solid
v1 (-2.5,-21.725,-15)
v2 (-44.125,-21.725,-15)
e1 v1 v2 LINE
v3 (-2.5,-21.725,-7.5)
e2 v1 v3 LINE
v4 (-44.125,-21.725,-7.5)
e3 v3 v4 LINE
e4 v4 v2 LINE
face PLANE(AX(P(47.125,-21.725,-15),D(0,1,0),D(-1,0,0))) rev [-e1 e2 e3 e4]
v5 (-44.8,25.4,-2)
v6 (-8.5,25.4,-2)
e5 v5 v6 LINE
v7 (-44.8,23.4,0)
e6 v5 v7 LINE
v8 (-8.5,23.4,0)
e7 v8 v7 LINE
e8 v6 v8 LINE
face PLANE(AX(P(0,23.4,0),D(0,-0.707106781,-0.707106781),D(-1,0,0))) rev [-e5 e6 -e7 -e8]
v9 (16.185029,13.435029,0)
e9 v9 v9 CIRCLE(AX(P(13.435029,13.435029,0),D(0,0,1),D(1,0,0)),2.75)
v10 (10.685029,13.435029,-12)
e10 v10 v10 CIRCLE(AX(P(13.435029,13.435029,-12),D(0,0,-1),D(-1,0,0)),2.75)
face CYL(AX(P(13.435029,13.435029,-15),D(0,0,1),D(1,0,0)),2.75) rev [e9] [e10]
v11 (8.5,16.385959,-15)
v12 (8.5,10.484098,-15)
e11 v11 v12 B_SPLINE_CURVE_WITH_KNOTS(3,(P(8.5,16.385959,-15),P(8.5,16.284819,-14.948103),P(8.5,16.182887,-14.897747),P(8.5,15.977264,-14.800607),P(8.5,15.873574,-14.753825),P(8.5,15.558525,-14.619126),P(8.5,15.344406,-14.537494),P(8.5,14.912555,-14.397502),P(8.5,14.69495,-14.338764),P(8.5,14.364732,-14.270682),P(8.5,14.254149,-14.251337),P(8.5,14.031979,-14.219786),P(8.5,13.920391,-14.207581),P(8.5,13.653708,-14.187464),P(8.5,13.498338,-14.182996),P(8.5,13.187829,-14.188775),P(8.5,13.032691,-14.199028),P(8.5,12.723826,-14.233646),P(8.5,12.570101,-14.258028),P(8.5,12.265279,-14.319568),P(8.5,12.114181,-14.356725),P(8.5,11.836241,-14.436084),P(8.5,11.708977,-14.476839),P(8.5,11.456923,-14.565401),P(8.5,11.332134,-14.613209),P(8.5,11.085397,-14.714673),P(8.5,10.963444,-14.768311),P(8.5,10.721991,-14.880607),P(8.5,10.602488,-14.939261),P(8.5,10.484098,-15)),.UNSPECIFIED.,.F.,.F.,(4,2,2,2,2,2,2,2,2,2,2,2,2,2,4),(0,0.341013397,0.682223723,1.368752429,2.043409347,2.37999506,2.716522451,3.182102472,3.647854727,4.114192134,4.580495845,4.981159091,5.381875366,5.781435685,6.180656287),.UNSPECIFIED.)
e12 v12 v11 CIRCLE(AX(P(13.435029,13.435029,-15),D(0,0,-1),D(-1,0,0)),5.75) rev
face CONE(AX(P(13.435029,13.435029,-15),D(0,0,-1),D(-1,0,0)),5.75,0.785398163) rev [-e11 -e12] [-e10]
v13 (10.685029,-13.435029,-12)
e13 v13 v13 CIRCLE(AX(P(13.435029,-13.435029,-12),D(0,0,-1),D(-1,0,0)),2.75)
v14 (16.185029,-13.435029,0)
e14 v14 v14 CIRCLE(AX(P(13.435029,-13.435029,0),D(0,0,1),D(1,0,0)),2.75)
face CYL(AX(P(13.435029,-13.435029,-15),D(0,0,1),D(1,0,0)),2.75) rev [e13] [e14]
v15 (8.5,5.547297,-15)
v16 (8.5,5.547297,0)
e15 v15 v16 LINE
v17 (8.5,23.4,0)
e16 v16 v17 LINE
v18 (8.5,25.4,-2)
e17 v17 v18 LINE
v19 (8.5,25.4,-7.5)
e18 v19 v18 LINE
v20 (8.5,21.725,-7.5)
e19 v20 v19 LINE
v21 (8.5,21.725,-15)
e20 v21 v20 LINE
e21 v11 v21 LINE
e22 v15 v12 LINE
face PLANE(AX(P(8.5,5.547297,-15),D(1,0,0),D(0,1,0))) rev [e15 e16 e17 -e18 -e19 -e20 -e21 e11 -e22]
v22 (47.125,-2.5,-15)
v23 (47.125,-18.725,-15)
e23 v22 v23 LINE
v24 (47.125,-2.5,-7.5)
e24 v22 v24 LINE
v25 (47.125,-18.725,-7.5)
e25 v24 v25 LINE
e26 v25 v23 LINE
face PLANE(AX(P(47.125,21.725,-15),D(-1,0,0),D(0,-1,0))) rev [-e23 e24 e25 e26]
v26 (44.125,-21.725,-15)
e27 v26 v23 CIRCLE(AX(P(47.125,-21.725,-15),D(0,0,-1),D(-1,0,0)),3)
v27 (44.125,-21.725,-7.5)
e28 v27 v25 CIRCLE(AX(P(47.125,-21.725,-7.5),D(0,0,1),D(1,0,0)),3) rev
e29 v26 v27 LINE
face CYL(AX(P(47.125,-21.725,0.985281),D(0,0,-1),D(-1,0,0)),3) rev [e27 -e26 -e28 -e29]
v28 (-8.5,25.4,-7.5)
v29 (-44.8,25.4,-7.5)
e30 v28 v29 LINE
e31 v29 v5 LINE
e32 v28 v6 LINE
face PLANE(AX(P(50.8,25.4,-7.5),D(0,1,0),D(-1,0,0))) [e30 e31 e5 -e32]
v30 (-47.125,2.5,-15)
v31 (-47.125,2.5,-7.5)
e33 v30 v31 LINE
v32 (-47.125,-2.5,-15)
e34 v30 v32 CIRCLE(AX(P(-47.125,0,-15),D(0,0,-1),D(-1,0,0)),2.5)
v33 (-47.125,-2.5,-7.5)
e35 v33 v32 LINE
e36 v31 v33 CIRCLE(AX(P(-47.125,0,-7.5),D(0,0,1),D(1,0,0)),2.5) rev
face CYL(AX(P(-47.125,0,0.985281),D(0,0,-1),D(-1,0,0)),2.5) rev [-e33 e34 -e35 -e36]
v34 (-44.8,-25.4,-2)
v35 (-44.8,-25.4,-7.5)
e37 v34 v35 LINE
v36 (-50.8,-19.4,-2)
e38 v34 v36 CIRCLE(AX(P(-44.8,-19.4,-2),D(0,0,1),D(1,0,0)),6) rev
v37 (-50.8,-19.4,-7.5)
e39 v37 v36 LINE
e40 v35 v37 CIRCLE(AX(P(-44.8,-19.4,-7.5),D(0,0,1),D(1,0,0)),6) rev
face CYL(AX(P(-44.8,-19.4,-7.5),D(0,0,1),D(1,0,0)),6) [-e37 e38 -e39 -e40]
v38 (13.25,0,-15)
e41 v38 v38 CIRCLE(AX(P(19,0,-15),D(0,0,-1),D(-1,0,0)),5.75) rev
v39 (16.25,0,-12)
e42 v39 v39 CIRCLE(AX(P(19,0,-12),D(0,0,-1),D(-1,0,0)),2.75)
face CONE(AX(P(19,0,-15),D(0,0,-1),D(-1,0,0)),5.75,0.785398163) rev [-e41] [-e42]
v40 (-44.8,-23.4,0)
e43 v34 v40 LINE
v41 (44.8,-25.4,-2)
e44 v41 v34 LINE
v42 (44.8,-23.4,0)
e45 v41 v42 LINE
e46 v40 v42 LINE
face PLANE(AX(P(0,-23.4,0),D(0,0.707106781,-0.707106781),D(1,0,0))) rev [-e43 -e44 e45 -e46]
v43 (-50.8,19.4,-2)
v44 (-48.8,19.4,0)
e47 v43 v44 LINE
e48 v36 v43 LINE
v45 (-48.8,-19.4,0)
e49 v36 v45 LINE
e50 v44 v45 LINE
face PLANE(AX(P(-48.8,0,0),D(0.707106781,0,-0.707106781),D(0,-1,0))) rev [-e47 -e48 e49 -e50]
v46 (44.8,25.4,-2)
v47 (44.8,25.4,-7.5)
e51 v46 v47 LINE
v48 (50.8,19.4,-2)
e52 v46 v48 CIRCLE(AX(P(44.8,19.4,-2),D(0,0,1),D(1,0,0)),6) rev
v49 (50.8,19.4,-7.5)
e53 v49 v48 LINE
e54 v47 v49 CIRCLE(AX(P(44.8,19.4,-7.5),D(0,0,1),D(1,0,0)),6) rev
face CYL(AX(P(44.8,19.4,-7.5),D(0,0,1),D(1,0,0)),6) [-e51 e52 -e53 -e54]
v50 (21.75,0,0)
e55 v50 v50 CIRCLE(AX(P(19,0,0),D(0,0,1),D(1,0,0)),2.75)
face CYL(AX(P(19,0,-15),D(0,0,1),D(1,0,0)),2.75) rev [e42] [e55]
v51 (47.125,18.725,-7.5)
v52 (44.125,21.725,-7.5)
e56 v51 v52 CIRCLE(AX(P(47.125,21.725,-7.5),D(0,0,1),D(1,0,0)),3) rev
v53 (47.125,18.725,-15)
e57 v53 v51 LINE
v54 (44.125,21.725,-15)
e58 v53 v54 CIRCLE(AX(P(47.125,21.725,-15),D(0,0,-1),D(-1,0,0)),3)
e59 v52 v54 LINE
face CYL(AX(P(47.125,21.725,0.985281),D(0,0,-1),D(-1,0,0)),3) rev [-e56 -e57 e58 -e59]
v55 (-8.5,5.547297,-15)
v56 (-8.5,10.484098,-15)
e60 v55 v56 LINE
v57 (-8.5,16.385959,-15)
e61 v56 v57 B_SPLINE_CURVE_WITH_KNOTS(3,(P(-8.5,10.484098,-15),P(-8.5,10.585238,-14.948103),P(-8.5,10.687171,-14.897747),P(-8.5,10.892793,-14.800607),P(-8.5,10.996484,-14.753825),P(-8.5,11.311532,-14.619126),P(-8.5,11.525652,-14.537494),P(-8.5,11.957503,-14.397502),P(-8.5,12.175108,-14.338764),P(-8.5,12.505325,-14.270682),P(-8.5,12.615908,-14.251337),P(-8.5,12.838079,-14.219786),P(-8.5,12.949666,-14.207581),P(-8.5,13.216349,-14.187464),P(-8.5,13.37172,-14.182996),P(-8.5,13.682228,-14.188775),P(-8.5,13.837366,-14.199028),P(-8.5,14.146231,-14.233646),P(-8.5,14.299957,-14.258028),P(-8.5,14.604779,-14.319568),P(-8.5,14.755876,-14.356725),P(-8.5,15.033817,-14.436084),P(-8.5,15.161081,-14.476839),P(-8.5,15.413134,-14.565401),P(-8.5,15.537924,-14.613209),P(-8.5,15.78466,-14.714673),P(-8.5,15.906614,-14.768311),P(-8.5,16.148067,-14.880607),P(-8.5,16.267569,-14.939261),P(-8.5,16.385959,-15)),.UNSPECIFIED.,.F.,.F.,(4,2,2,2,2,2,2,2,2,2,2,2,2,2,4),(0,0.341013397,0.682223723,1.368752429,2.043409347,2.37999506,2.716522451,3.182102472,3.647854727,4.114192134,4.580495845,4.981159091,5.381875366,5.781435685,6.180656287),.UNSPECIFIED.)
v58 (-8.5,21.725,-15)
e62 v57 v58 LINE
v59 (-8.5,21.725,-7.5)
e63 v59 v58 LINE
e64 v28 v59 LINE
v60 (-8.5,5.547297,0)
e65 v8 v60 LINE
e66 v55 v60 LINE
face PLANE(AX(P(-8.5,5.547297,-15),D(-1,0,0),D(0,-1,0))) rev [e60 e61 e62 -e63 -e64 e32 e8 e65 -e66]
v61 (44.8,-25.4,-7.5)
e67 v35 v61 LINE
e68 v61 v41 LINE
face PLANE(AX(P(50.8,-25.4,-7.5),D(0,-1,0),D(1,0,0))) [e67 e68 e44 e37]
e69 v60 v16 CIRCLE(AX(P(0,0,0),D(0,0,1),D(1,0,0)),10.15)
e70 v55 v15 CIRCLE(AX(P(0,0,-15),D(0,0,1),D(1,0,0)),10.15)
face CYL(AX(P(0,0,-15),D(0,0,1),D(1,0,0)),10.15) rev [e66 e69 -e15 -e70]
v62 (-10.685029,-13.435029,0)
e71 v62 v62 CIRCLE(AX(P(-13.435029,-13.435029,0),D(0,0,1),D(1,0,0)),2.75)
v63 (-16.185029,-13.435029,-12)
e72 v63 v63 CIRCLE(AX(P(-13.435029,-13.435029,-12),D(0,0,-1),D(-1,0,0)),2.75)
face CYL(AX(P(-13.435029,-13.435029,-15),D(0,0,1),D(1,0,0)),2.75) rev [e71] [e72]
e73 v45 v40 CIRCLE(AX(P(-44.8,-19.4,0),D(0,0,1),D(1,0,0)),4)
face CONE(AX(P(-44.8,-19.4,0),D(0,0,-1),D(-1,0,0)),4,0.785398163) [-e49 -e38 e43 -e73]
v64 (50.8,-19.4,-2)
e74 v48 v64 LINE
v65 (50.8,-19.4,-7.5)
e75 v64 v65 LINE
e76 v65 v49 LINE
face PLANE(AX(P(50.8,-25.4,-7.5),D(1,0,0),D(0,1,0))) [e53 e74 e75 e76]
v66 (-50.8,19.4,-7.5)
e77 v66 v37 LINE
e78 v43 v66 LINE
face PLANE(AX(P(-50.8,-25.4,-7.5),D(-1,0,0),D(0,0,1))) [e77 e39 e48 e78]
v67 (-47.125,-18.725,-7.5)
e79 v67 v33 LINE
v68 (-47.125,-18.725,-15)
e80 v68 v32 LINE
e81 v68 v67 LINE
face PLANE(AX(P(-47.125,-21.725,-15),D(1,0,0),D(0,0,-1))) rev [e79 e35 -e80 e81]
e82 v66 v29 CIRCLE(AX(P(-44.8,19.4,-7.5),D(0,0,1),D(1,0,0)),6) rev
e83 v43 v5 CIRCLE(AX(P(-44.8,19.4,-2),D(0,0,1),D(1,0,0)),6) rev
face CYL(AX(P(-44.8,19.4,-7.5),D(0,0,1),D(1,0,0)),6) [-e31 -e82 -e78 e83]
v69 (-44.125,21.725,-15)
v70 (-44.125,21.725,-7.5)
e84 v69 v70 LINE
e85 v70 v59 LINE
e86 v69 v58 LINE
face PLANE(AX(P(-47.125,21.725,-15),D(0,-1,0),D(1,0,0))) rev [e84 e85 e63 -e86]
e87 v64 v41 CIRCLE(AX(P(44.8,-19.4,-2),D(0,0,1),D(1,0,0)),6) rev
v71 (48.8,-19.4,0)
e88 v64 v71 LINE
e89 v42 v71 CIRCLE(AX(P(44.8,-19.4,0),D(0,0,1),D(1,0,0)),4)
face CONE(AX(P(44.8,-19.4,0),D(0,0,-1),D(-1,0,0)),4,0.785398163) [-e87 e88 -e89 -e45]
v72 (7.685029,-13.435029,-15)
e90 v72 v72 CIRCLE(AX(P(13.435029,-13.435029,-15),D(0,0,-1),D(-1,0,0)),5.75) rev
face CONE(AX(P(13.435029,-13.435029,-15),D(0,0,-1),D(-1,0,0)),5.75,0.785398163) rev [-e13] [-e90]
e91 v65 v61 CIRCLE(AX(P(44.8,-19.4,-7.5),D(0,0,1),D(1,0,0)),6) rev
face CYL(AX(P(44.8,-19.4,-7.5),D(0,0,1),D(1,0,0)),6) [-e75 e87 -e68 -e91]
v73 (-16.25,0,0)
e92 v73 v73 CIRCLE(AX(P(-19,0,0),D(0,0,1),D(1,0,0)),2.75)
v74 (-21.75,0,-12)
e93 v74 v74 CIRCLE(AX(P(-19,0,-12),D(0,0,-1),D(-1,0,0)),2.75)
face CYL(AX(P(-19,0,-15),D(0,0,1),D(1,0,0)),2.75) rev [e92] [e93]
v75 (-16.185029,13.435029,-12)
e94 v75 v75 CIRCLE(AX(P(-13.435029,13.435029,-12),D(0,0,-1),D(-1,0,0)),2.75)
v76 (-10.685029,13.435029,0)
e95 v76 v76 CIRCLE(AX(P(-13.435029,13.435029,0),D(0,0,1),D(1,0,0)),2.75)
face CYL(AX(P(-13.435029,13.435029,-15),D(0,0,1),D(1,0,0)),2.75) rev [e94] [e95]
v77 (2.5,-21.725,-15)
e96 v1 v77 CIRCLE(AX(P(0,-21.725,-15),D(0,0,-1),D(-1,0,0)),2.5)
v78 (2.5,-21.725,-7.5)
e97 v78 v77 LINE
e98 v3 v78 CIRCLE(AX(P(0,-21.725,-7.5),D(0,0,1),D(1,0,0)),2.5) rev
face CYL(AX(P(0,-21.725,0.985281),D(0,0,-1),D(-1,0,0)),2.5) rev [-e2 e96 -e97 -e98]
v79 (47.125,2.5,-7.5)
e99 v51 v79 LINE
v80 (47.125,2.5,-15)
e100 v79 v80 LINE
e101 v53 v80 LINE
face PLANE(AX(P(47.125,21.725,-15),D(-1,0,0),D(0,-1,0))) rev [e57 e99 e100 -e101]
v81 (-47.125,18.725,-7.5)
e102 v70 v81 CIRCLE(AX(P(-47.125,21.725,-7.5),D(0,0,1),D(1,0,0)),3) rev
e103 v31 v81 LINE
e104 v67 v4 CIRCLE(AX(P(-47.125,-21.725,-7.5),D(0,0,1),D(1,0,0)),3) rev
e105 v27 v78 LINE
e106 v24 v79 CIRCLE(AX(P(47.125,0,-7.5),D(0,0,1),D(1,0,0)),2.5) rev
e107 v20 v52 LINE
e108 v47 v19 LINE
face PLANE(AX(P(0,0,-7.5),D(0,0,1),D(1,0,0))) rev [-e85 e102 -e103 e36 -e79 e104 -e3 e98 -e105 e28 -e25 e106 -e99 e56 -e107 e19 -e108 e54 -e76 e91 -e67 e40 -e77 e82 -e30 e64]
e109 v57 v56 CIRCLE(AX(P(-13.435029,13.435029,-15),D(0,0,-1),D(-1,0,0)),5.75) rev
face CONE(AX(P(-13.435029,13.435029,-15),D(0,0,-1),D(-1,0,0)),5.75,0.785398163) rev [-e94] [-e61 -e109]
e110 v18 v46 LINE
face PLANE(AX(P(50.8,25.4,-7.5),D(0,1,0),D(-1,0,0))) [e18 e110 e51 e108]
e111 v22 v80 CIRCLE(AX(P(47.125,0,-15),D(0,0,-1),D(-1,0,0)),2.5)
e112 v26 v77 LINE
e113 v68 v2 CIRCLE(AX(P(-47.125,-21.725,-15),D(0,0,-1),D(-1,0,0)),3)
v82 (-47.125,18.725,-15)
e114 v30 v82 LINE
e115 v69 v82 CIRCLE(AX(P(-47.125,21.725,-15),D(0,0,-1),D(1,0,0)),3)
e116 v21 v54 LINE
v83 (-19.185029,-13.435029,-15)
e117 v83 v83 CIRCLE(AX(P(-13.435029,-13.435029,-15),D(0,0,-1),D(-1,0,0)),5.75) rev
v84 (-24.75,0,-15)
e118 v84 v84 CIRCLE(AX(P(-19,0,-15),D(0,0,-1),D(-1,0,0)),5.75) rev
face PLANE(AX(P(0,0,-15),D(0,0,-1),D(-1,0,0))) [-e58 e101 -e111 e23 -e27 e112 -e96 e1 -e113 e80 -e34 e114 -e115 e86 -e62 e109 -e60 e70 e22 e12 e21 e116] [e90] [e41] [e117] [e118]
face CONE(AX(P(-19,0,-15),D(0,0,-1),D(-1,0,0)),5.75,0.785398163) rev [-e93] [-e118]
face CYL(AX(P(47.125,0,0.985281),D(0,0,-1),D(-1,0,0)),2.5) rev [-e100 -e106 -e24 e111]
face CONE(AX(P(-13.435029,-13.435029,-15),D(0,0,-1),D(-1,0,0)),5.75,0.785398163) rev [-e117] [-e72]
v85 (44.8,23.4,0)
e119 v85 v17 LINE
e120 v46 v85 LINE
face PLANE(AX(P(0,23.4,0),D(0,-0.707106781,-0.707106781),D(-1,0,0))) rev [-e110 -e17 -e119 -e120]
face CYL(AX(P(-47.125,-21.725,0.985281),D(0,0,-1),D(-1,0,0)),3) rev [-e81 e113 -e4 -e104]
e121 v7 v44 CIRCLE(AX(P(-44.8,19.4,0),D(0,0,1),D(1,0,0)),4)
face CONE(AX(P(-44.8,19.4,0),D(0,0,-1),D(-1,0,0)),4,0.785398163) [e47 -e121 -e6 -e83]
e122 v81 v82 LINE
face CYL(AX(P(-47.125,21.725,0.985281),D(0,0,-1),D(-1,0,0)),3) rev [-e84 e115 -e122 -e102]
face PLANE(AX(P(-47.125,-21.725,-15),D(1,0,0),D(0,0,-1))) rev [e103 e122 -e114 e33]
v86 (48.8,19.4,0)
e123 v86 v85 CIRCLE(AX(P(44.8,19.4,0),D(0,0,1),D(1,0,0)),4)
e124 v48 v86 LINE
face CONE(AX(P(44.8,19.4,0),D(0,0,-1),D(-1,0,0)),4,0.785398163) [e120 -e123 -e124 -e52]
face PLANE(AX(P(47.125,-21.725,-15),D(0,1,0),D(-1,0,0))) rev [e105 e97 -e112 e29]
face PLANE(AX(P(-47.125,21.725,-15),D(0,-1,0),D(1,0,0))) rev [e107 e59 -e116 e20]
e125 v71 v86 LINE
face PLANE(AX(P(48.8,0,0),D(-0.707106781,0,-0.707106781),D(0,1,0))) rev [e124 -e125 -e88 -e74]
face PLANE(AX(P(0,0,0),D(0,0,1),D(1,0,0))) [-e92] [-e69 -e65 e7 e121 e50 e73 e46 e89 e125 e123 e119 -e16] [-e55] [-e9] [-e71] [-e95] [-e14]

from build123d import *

# Parameters (mm, degrees)
SKETCH1_W           = 101.6
SKETCH1_H           = 50.8
BOSS_EXTRUDE1_DEPTH = 7.5
SKETCH2_W           = 94.25
SKETCH2_H           = 43.45
BOSS_EXTRUDE2_DEPTH = 7.5
SKETCH3_R           = 2.75
CUT_EXTRUDE1_DEPTH  = 59.74351028
FILLET1_R           = 6
SKETCH4_R           = 3
SKETCH4_R_2         = 2.5
CUT_EXTRUDE2_DEPTH  = 7.5
CHAMFER1_SIZE       = 2
CHAMFER2_SIZE       = 3


with BuildPart() as part:
    # Sketch1 → Boss-Extrude1 (new body)
    with BuildSketch(Plane.XY):
        Rectangle(SKETCH1_W, SKETCH1_H)
    extrude(amount=-BOSS_EXTRUDE1_DEPTH)

    # Sketch2 → Boss-Extrude2 (add)
    with BuildSketch(Plane(origin=(0, 0, -7.5), x_dir=(-1, 0, 0), z_dir=(0, 0, -1))):
        Rectangle(SKETCH2_W, SKETCH2_H)
    extrude(amount=BOSS_EXTRUDE2_DEPTH)

    # Sketch3 → Cut-Extrude1 (cut, through all)
    with BuildSketch(Plane.XY):
        with Locations((-19, 0)):
            Circle(SKETCH3_R)
        with Locations((-13.435028843, 13.435028843)):
            Circle(SKETCH3_R)
        with Locations((13.435028843, 13.435028843)):
            Circle(SKETCH3_R)
        with Locations((19, 0)):
            Circle(SKETCH3_R)
        with Locations((13.435028843, -13.435028843)):
            Circle(SKETCH3_R)
        with Locations((-13.435028843, -13.435028843)):
            Circle(SKETCH3_R)
        with BuildLine():
            Line((8.5, 5.547296639), (8.5, 25.4))
            Line((8.5, 25.4), (-8.5, 25.4))
            Line((-8.5, 25.4), (-8.5, 5.547296639))
            ThreePointArc((-8.5, 5.547296639), (0, -10.15), (8.5, 5.547296639))
        make_face()
    extrude(amount=-CUT_EXTRUDE1_DEPTH, mode=Mode.SUBTRACT)

    # Fillet1
    fillet1_edges = [part.edges().sort_by_distance(p)[0] for p in [
        (-50.8, 25.4, -3.75),
        (50.8, 25.4, -3.75),
        (50.8, -25.4, -3.75),
        (-50.8, -25.4, -3.75),
    ]]
    fillet(fillet1_edges, radius=FILLET1_R)

    # Sketch4 → Cut-Extrude2 (cut)
    with BuildSketch(Plane(origin=(0, 0, -15), x_dir=(-1, 0, 0), z_dir=(0, 0, -1))):
        with Locations((-47.125, 21.725)):
            Circle(SKETCH4_R)
        with Locations((-47.125, -21.725)):
            Circle(SKETCH4_R)
        with Locations((-47.125, 0)):
            Circle(SKETCH4_R_2)
        with Locations((0, -21.725)):
            Circle(SKETCH4_R_2)
        with Locations((47.125, -21.725)):
            Circle(SKETCH4_R)
        with Locations((47.125, 0)):
            Circle(SKETCH4_R_2)
        with Locations((47.125, 21.725)):
            Circle(SKETCH4_R)
    extrude(amount=-CUT_EXTRUDE2_DEPTH, mode=Mode.SUBTRACT)

    # Chamfer1
    chamfer1_edges = [part.edges().sort_by_distance(p)[0] for p in [
        (-26.65, 25.4, 0),
        (0, -25.4, 0),
        (-50.8, 0, 0),
        (50.8, 0, 0),
        (26.65, 25.4, 0),
        (49.042640687, 23.642640687, 0),
        (-49.042640687, 23.642640687, 0),
        (-49.042640687, -23.642640687, 0),
        (49.042640687, -23.642640687, 0),
    ]]
    chamfer(chamfer1_edges, length=CHAMFER1_SIZE)

    # Chamfer2
    # the kernel refuses this chamfer: 3 mm, written as the material it takes off along each edge
    with BuildSketch(Plane(origin=(-13.435028843, -13.435028843, -15), x_dir=(1, 0, 0), z_dir=(0, -1, 0))) as chamfer2_piece_1:
        Polygon((2.75, CHAMFER2_SIZE), (2.75 + CHAMFER2_SIZE, 0), (2.75, 0), align=None)
    revolve(axis=Axis((-13.435028843, -13.435028843, -15), (0, 0, 1)), mode=Mode.SUBTRACT)
    with BuildSketch(Plane(origin=(13.435028843, -13.435028843, -15), x_dir=(1, 0, 0), z_dir=(0, -1, 0))) as chamfer2_piece_2:
        Polygon((2.75, CHAMFER2_SIZE), (2.75 + CHAMFER2_SIZE, 0), (2.75, 0), align=None)
    revolve(axis=Axis((13.435028843, -13.435028843, -15), (0, 0, 1)), mode=Mode.SUBTRACT)
    with BuildSketch(Plane(origin=(19, 0, -15), x_dir=(1, 0, 0), z_dir=(0, -1, 0))) as chamfer2_piece_3:
        Polygon((2.75, CHAMFER2_SIZE), (2.75 + CHAMFER2_SIZE, 0), (2.75, 0), align=None)
    revolve(axis=Axis((19, 0, -15), (0, 0, 1)), mode=Mode.SUBTRACT)
    with BuildSketch(Plane(origin=(13.435028843, 13.435028843, -15), x_dir=(1, 0, 0), z_dir=(0, -1, 0))) as chamfer2_piece_4:
        Polygon((2.75, CHAMFER2_SIZE), (2.75 + CHAMFER2_SIZE, 0), (2.75, 0), align=None)
    revolve(axis=Axis((13.435028843, 13.435028843, -15), (0, 0, 1)), mode=Mode.SUBTRACT)
    with BuildSketch(Plane(origin=(-13.435028843, 13.435028843, -15), x_dir=(1, 0, 0), z_dir=(0, -1, 0))) as chamfer2_piece_5:
        Polygon((2.75, CHAMFER2_SIZE), (2.75 + CHAMFER2_SIZE, 0), (2.75, 0), align=None)
    revolve(axis=Axis((-13.435028843, 13.435028843, -15), (0, 0, 1)), mode=Mode.SUBTRACT)
    with BuildSketch(Plane(origin=(-19, 0, -15), x_dir=(1, 0, 0), z_dir=(0, -1, 0))) as chamfer2_piece_6:
        Polygon((2.75, CHAMFER2_SIZE), (2.75 + CHAMFER2_SIZE, 0), (2.75, 0), align=None)
    revolve(axis=Axis((-19, 0, -15), (0, 0, 1)), mode=Mode.SUBTRACT)


solid = part.part
